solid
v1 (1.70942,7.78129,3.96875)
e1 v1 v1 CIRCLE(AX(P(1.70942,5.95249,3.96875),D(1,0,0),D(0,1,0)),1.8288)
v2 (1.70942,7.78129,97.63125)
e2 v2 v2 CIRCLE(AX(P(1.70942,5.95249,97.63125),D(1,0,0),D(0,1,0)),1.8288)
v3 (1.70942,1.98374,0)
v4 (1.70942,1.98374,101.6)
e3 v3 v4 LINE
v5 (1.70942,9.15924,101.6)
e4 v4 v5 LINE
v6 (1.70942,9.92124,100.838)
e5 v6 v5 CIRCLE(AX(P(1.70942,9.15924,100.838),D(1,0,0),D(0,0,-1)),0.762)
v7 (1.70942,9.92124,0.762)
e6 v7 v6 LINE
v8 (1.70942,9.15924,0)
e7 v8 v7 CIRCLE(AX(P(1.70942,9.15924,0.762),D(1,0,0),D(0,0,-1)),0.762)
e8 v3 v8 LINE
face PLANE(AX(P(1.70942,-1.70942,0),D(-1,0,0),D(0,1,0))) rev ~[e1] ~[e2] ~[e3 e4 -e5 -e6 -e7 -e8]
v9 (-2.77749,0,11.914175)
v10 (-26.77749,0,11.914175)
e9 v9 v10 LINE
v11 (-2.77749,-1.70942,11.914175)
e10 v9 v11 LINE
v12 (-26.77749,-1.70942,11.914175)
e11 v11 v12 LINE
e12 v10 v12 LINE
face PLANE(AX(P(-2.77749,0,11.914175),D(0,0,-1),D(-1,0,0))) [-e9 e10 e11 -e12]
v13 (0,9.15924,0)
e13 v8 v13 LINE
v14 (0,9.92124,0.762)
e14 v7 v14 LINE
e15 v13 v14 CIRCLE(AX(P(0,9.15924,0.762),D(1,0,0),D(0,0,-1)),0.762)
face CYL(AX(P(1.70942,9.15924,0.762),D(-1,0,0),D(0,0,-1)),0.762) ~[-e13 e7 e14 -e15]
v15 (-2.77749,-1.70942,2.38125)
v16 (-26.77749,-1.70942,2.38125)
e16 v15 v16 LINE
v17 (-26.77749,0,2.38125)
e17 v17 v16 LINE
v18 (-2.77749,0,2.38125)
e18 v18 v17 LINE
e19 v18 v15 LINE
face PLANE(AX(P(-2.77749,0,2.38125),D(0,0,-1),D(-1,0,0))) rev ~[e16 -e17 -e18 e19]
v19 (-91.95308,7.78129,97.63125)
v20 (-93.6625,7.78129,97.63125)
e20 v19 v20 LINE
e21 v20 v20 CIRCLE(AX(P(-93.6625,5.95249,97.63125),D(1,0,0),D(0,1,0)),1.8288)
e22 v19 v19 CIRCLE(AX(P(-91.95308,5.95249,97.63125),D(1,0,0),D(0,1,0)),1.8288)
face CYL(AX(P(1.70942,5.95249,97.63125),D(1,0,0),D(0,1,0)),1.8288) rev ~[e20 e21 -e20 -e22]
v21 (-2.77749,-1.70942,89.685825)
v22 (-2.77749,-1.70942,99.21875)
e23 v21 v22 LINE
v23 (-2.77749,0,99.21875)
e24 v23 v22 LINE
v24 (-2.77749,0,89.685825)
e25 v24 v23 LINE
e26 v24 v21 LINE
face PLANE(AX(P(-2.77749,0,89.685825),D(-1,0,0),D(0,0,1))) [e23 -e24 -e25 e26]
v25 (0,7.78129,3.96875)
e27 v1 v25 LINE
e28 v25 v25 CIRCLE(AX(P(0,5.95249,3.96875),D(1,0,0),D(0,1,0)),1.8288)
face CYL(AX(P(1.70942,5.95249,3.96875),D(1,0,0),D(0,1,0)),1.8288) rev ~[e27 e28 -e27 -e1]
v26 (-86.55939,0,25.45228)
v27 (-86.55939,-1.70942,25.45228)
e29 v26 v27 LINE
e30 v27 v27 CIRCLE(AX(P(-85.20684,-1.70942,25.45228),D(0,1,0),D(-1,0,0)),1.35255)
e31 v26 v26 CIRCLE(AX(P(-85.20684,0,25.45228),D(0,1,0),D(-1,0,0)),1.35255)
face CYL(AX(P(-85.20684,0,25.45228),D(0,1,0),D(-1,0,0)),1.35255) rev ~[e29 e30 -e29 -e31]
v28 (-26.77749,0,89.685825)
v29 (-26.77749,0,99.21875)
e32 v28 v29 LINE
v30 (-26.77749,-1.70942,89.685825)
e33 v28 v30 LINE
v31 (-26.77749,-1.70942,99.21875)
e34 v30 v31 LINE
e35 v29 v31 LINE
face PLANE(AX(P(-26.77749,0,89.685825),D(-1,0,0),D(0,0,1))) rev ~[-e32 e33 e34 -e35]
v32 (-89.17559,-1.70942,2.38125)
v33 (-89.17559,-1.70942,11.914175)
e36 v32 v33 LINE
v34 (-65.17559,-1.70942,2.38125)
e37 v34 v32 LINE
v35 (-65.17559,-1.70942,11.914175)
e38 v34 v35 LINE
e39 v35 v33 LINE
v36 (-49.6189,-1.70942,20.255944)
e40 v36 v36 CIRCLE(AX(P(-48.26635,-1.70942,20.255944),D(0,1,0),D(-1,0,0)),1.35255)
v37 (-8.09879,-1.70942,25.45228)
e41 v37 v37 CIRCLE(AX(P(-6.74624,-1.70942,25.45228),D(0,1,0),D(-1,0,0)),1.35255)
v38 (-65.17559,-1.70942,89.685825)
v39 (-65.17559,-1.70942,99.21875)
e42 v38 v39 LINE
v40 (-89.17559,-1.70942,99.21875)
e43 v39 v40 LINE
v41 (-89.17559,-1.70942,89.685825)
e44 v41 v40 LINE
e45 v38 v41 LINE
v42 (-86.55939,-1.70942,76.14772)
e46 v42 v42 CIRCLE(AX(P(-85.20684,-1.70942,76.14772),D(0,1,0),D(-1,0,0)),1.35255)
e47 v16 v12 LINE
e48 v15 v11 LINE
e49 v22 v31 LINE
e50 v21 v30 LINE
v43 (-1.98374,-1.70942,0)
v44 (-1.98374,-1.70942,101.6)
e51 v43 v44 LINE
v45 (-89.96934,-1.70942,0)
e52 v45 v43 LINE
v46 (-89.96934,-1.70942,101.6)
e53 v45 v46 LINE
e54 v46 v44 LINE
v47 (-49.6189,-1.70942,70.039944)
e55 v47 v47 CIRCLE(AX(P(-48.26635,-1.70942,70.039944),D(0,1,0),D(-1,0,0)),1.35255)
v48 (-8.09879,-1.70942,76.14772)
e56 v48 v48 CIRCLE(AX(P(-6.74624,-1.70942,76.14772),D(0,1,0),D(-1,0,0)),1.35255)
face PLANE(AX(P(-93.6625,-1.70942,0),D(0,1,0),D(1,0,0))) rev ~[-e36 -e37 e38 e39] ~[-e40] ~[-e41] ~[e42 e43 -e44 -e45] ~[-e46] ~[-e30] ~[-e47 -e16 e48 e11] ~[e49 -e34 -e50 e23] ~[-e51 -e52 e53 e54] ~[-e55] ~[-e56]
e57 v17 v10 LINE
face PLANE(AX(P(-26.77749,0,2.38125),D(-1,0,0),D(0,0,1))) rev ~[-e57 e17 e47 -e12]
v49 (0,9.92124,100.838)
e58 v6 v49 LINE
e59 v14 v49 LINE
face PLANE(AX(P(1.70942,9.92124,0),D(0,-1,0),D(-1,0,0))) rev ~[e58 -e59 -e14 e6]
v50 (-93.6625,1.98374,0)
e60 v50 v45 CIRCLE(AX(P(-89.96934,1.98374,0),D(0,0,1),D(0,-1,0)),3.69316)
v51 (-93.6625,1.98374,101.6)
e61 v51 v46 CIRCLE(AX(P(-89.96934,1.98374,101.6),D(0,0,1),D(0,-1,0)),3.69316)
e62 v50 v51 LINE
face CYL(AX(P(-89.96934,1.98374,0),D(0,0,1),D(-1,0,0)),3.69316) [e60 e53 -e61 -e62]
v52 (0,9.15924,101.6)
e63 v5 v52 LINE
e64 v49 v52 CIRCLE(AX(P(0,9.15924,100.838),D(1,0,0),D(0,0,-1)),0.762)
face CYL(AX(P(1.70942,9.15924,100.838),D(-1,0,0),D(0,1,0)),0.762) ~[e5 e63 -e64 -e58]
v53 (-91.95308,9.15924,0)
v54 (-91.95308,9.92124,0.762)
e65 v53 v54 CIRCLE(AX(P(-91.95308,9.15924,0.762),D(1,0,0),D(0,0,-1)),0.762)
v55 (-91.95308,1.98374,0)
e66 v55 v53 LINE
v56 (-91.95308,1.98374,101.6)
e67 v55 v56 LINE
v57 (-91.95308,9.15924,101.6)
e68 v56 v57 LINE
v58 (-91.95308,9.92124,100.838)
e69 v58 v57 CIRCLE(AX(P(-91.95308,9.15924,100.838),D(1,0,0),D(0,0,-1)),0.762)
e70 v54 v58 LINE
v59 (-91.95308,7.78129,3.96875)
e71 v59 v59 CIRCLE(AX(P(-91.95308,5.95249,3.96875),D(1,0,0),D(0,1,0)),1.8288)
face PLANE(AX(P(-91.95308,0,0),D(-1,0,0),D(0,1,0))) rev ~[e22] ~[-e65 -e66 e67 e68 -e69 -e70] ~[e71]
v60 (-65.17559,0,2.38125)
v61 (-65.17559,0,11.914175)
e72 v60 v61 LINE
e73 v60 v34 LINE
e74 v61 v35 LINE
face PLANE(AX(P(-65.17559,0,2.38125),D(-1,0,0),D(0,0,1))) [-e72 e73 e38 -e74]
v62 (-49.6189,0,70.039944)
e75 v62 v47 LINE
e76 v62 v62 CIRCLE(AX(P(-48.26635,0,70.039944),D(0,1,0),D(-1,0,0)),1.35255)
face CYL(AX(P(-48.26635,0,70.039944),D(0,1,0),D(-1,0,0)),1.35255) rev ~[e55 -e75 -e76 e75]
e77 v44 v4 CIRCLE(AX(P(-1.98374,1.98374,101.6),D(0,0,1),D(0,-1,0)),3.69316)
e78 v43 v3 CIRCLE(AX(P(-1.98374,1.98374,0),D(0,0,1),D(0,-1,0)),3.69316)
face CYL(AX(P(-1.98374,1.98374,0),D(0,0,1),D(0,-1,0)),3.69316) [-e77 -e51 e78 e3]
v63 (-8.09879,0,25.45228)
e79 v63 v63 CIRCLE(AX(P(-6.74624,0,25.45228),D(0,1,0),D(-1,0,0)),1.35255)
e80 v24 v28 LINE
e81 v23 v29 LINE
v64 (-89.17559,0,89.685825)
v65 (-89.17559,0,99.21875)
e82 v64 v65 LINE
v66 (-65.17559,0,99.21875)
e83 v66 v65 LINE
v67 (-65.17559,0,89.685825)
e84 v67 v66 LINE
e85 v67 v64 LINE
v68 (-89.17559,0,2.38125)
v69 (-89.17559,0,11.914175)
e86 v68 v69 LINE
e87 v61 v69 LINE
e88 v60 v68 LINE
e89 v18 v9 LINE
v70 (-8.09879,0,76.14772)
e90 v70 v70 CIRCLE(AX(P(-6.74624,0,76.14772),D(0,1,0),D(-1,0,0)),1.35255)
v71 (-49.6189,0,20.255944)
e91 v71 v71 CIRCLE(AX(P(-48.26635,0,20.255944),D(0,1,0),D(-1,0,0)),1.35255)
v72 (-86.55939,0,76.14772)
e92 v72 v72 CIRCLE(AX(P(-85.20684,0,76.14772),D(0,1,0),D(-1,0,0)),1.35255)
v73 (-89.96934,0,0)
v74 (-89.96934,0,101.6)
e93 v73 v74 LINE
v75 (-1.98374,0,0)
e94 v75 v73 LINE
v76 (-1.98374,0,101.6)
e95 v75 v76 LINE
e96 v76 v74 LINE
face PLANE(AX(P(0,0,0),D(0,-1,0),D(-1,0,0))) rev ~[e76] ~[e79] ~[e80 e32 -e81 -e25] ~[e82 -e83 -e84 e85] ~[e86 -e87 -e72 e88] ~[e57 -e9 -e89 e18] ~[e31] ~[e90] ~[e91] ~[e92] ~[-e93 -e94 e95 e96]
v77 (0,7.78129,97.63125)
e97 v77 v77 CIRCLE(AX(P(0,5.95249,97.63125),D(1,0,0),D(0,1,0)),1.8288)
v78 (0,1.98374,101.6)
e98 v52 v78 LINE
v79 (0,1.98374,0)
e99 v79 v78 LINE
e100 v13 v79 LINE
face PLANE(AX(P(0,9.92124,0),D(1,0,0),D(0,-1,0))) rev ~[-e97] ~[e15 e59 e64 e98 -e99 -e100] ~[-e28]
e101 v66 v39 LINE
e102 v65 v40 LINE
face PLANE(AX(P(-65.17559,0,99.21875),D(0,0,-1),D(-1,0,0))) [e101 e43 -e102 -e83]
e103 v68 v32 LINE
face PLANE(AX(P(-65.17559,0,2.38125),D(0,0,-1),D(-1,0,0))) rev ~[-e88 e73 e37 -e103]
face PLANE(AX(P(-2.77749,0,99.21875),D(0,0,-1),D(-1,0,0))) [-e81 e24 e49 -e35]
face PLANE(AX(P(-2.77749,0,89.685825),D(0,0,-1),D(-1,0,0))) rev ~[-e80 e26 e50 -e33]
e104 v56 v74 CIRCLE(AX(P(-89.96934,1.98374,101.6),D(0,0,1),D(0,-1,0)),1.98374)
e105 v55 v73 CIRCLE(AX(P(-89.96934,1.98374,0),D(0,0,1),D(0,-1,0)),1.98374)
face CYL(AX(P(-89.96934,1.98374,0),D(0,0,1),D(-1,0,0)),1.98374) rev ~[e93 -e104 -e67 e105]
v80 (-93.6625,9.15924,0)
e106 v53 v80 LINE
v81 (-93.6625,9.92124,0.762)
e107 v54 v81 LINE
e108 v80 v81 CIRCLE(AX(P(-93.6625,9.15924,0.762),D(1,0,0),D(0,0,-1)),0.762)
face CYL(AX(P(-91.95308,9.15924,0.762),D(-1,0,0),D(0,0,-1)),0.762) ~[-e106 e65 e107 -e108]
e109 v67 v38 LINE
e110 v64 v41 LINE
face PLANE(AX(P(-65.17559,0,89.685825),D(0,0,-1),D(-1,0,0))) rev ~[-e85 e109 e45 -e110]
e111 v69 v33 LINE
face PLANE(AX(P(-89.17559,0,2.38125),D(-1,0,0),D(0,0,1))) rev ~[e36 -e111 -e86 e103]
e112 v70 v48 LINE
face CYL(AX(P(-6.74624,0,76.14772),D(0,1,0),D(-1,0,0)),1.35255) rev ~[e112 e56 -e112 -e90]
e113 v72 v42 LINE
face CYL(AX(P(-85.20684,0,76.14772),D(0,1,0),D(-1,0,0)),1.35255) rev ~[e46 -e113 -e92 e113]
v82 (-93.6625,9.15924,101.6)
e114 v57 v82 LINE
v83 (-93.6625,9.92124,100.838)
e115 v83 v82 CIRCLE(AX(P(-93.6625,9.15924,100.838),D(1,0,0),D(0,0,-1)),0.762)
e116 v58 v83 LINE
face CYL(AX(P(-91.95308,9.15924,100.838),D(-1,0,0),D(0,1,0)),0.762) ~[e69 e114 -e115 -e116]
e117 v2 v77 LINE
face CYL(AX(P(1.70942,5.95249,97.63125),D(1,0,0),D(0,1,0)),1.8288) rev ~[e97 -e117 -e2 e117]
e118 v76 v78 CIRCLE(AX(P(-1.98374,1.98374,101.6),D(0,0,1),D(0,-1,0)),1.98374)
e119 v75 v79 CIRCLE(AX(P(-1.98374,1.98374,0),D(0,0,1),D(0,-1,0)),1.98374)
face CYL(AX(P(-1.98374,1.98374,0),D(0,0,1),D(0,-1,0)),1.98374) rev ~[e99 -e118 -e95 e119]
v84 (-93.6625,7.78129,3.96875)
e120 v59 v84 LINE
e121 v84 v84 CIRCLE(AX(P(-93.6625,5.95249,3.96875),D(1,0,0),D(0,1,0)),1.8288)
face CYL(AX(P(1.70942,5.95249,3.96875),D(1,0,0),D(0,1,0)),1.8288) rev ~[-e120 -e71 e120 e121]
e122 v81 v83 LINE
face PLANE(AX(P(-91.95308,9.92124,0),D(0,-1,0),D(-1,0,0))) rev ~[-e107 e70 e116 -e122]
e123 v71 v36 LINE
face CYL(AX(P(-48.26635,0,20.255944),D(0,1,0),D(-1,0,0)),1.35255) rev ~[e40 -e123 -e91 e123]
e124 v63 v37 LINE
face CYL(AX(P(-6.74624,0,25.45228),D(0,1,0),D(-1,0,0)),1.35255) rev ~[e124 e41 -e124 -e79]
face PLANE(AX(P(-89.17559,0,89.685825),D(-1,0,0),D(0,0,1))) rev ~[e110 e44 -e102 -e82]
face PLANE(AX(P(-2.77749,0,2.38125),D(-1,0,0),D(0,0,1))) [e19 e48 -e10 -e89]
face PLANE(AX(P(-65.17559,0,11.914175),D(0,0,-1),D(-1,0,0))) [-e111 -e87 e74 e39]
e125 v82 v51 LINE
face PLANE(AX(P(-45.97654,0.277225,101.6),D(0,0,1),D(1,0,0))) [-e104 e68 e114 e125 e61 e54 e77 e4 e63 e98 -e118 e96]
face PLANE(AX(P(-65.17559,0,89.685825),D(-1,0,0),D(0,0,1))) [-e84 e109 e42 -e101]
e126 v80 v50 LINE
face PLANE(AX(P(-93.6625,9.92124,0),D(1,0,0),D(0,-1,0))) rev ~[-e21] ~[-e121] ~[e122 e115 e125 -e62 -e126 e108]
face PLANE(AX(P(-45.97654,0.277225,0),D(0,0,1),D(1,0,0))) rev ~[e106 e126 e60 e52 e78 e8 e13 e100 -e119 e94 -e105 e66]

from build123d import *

# Parameters (mm, degrees)
F1_DEPTH  = 101.6
F2_R      = 3.69316
F3_R      = 1.98374
F4_W      = 24
F4_H      = 9.5329248
F4_R      = 1.35255
F5_DEPTH  = 1.70942
F6_R      = 1.8288
F7_DEPTH  = 95.37192
F8_R      = 0.762
F9_R      = 1.35255
F10_DEPTH = 1.70942


with BuildPart() as f1:
    # F0 (on Top) → F1 (new body)
    with BuildSketch(Plane.XY):
        Polygon((0, 9.92124), (0, 0), (-91.95308, 0), (-91.95308, 9.92124), (-93.6625, 9.92124), (-93.6625, -1.70942), (1.70942, -1.70942), (1.70942, 9.92124), align=None)
    extrude(amount=F1_DEPTH)

    # F2
    f2_edges = [f1.edges().sort_by_distance(p)[0] for p in [
        (1.70942, -1.70942, 50.8),
        (-93.6625, -1.70942, 50.8),
    ]]
    fillet(f2_edges, radius=F2_R)

    # F3
    f3_edges = [f1.edges().sort_by_distance(p)[0] for p in [
        (0, 0, 50.8),
        (-91.95308, 0, 50.8),
    ]]
    fillet(f3_edges, radius=F3_R)

    # F4 (on face) → F5 (cut, through all)
    with BuildSketch(Plane(origin=(0, 0, 0), x_dir=(-1, 0, 0), z_dir=(0, 1, 0))):
        with Locations((77.17559, 94.4522876)):
            Rectangle(F4_W, F4_H)
        with Locations((77.17559, 7.1477124)):
            Rectangle(F4_W, F4_H)
        with Locations((14.77749, 7.1477124)):
            Rectangle(F4_W, F4_H)
        with Locations((14.77749, 94.4522876)):
            Rectangle(F4_W, F4_H)
        with Locations((85.20684, 76.1477196107)):
            Circle(F4_R)
        with Locations((85.20684, 25.4522803893)):
            Circle(F4_R)
        with Locations((6.74624, 25.4522803893)):
            Circle(F4_R)
        with Locations((6.74624, 76.1477196107)):
            Circle(F4_R)
    extrude(amount=-F5_DEPTH, mode=Mode.SUBTRACT)

    # F6 (on face) → F7 (cut, through all)
    with BuildSketch(Plane.YZ.offset(1.70942)):
        with Locations((5.95249, 97.63125)):
            Circle(F6_R)
        with Locations((5.95249, 3.96875)):
            Circle(F6_R)
    extrude(amount=-F7_DEPTH, mode=Mode.SUBTRACT)

    # F8
    f8_edges = [f1.edges().sort_by_distance(p)[0] for p in [
        (-92.80779, 9.92124, 101.6),
        (-92.80779, 9.92124, 0),
        (0.85471, 9.92124, 0),
        (0.85471, 9.92124, 101.6),
    ]]
    fillet(f8_edges, radius=F8_R)

    # F9 (on face) → F10 (cut, through all)
    with BuildSketch(Plane(origin=(0, 0, 0), x_dir=(-1, 0, 0), z_dir=(0, 1, 0))):
        with Locations((48.26635, 70.0399442418)):
            Circle(F9_R)
        with Locations((48.26635, 20.2559442418)):
            Circle(F9_R)
    extrude(amount=-F10_DEPTH, mode=Mode.SUBTRACT)


solid = f1.part
